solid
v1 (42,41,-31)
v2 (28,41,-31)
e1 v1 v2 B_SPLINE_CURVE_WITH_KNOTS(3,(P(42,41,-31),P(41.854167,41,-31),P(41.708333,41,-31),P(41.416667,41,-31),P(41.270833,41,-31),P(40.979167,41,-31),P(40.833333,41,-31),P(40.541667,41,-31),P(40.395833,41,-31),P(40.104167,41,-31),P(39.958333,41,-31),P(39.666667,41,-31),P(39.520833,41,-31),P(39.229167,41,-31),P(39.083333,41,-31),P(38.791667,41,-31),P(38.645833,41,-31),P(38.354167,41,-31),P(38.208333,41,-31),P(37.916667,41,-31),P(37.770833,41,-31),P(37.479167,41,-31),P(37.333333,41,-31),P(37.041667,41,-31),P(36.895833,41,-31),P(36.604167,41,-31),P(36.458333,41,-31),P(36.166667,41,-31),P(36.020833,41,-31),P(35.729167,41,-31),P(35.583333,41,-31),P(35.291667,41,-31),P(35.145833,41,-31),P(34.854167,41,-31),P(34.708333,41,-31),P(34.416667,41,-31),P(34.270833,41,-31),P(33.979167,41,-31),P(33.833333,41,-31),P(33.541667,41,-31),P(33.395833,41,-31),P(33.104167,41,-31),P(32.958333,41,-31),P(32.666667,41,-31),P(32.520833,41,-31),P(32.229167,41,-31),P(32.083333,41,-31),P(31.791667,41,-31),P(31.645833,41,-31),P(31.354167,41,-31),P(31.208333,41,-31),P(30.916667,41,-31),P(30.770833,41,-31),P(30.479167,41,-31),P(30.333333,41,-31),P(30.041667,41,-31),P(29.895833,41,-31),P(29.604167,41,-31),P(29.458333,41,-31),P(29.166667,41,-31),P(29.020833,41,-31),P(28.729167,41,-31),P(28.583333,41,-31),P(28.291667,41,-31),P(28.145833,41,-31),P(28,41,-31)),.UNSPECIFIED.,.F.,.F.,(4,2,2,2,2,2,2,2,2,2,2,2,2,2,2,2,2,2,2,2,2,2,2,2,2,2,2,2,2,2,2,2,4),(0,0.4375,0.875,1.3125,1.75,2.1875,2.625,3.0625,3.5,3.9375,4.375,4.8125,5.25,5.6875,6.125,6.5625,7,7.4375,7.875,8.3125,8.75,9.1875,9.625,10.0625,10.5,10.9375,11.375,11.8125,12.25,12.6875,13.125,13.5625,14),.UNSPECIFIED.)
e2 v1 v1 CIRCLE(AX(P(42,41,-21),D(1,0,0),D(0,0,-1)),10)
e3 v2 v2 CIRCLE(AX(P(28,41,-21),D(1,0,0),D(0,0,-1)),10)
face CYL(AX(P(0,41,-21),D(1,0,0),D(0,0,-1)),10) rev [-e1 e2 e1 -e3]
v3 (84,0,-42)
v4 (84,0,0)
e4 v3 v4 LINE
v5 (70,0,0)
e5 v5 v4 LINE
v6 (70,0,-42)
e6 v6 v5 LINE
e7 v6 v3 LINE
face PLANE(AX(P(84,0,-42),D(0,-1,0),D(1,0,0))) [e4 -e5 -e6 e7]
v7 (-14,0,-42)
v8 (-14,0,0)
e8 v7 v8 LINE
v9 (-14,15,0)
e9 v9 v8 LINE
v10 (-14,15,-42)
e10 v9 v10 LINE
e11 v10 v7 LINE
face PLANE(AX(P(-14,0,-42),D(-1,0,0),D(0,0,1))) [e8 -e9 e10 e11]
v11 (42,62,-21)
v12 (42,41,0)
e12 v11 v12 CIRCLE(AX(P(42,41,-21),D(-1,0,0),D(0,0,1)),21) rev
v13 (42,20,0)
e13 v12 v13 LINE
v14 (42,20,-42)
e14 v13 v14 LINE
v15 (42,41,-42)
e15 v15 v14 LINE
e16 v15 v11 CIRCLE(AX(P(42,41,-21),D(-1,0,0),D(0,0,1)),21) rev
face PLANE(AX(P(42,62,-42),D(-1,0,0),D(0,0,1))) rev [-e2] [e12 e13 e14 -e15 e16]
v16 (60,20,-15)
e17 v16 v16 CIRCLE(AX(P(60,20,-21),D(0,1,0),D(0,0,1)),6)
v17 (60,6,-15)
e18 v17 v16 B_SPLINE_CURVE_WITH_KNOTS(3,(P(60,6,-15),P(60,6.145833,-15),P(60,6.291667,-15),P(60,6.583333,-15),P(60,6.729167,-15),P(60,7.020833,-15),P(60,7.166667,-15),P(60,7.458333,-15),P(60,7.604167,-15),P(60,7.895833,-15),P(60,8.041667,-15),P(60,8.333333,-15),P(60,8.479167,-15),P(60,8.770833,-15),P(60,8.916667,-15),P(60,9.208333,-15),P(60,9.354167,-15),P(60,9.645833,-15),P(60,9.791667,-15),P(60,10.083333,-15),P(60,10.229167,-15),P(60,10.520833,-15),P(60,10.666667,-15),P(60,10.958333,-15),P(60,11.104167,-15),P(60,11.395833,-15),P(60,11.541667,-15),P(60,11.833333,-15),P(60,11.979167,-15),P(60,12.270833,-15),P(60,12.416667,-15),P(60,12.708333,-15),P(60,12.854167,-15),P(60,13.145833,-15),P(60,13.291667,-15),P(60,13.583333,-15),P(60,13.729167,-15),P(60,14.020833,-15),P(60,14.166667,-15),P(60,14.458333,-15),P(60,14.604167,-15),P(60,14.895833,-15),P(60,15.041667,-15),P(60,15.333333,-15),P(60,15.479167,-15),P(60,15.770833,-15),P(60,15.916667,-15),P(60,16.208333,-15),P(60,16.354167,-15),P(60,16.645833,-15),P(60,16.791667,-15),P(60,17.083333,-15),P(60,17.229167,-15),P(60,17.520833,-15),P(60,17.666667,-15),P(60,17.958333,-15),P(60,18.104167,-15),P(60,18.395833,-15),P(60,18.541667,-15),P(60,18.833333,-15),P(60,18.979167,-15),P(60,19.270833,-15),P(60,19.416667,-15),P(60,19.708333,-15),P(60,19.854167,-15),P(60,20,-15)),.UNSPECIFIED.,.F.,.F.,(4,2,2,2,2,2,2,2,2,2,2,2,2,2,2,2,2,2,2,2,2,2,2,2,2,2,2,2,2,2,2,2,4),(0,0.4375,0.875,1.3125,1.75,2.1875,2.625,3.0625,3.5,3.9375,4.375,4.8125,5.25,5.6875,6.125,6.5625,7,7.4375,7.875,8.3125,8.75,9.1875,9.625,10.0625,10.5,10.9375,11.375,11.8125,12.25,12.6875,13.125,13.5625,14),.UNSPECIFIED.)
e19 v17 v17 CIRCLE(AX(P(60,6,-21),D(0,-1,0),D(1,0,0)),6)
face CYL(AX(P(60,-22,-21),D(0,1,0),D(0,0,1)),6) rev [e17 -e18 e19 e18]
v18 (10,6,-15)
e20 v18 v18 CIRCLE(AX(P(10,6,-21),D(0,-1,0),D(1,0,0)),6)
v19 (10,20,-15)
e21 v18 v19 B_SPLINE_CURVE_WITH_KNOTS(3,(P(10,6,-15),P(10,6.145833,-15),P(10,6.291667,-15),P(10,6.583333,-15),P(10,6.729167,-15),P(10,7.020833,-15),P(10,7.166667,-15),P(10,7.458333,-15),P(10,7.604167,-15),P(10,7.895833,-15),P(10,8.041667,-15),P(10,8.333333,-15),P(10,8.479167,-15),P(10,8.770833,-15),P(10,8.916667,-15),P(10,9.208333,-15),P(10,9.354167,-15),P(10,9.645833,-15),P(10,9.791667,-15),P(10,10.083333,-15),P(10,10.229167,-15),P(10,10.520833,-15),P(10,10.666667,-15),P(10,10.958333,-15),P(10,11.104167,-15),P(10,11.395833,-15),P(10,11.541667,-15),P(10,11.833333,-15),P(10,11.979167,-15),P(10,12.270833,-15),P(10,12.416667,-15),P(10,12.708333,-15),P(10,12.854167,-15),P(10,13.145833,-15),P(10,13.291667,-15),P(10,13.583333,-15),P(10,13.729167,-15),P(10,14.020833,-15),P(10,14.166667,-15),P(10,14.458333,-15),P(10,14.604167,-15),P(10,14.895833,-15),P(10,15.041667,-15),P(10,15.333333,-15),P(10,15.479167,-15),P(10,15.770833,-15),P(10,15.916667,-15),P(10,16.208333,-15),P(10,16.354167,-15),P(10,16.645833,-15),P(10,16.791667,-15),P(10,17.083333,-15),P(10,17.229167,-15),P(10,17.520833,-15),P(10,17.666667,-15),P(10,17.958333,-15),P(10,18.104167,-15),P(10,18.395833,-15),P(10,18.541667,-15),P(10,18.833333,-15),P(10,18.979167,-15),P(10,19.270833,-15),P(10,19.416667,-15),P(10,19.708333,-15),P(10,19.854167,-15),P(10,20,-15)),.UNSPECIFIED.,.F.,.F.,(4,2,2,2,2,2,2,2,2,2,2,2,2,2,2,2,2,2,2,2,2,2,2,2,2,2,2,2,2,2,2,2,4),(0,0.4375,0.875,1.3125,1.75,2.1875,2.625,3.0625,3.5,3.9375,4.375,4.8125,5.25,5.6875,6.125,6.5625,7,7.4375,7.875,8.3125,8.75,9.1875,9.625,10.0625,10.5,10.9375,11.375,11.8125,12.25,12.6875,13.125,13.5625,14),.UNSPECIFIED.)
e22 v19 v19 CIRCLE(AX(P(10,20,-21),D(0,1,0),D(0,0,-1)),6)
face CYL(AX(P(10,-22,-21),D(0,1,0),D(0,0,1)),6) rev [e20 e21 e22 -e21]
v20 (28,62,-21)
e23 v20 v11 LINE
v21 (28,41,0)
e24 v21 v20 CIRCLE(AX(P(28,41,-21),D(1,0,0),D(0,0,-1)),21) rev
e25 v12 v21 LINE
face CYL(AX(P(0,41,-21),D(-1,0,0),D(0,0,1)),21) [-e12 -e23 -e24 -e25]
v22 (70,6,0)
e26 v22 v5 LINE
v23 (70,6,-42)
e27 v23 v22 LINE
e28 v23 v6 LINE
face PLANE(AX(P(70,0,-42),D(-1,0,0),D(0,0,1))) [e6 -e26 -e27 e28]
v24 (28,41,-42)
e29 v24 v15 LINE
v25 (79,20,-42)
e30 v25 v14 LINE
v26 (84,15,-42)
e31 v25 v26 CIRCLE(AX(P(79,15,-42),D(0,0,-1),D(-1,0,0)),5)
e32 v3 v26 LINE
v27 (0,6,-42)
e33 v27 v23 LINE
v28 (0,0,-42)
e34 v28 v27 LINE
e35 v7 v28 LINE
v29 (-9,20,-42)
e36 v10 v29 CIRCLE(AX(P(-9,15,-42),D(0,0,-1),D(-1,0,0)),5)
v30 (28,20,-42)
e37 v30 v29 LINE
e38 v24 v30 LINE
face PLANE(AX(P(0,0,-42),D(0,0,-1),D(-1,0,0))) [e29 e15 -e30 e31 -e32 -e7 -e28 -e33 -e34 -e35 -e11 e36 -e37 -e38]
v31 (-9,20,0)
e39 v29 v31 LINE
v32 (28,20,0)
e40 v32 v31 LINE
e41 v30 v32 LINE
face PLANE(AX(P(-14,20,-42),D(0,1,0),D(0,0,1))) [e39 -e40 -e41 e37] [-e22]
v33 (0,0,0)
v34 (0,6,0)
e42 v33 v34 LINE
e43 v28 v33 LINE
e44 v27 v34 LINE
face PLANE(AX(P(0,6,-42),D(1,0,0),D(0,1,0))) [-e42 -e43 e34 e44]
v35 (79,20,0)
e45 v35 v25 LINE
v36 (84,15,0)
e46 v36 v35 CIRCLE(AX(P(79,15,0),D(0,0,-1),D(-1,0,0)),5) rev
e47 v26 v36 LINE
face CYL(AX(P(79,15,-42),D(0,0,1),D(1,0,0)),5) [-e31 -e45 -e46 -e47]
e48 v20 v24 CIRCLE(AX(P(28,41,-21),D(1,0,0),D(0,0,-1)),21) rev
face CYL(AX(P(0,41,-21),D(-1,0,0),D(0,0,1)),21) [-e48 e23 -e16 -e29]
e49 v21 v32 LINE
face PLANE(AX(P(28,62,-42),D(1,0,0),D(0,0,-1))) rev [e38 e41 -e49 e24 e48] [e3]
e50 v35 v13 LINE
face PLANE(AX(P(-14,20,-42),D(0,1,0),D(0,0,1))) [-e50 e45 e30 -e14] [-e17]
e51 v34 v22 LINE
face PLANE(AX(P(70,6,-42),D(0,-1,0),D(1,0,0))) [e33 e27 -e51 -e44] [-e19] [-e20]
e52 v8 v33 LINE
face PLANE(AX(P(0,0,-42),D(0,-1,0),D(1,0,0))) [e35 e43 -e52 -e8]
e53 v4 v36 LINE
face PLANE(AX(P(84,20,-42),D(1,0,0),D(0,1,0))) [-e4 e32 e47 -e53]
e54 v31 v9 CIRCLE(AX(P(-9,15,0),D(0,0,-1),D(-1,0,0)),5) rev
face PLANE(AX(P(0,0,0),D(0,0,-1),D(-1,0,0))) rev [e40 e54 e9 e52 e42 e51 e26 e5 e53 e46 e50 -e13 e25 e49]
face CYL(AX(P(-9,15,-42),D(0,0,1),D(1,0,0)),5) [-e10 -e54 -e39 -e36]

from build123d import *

# Parameters (mm, degrees)
BOSS_EXTRUDE1_DEPTH = 42
SKETCH4_R           = 6
CUT_EXTRUDE1_DEPTH  = 42
SKETCH6_W           = 14
SKETCH6_H           = 42
BOSS_EXTRUDE2_DEPTH = 42
FILLET1_R           = 21
SKETCH7_R           = 10
CUT_EXTRUDE2_DEPTH  = 42
FILLET4_R           = 5


with BuildPart() as part:
    # Sketch1 → Boss-Extrude1 (new body)
    with BuildSketch(Plane.XY):
        Polygon((0, 0), (-14, 0), (-14, 20), (84, 20), (84, 0), (70, 0), (70, 6), (0, 6), align=None)
    extrude(amount=-BOSS_EXTRUDE1_DEPTH)

    # Sketch4 → Cut-Extrude1 (cut)
    with BuildSketch(Plane(origin=(0, 20, 0), x_dir=(1, 0, 0), z_dir=(0, 1, 0))):
        with Locations(Location((60, 21, 0), (0, 0, 270))):
            Circle(SKETCH4_R)
        with Locations(Location((10, 21, 0), (0, 0, 270))):
            Circle(SKETCH4_R)
    extrude(amount=-CUT_EXTRUDE1_DEPTH, mode=Mode.SUBTRACT)

    # Sketch6 → Boss-Extrude2 (add)
    with BuildSketch(Plane(origin=(0, 20, 0), x_dir=(1, 0, 0), z_dir=(0, 1, 0))):
        with Locations((35, 21)):
            Rectangle(SKETCH6_W, SKETCH6_H)
    extrude(amount=BOSS_EXTRUDE2_DEPTH)

    # Fillet1
    fillet1_edges = [part.edges().sort_by_distance(p)[0] for p in [
        (35, 62, -42),
        (35, 62, 0),
    ]]
    fillet(fillet1_edges, radius=FILLET1_R - 0.0001)  # a hair under: the kernel refuses the full size

    # Sketch7 → Cut-Extrude2 (cut)
    with BuildSketch(Plane(origin=(42, 0, 0), x_dir=(0, 0, -1), z_dir=(1, 0, 0))):
        with Locations((21, 41)):
            Circle(SKETCH7_R)
    extrude(amount=-CUT_EXTRUDE2_DEPTH, mode=Mode.SUBTRACT)

    # Fillet4
    fillet4_edges = [part.edges().sort_by_distance(p)[0] for p in [
        (-14, 20, -21),
        (84, 20, -21),
    ]]
    fillet(fillet4_edges, radius=FILLET4_R)


solid = part.part
